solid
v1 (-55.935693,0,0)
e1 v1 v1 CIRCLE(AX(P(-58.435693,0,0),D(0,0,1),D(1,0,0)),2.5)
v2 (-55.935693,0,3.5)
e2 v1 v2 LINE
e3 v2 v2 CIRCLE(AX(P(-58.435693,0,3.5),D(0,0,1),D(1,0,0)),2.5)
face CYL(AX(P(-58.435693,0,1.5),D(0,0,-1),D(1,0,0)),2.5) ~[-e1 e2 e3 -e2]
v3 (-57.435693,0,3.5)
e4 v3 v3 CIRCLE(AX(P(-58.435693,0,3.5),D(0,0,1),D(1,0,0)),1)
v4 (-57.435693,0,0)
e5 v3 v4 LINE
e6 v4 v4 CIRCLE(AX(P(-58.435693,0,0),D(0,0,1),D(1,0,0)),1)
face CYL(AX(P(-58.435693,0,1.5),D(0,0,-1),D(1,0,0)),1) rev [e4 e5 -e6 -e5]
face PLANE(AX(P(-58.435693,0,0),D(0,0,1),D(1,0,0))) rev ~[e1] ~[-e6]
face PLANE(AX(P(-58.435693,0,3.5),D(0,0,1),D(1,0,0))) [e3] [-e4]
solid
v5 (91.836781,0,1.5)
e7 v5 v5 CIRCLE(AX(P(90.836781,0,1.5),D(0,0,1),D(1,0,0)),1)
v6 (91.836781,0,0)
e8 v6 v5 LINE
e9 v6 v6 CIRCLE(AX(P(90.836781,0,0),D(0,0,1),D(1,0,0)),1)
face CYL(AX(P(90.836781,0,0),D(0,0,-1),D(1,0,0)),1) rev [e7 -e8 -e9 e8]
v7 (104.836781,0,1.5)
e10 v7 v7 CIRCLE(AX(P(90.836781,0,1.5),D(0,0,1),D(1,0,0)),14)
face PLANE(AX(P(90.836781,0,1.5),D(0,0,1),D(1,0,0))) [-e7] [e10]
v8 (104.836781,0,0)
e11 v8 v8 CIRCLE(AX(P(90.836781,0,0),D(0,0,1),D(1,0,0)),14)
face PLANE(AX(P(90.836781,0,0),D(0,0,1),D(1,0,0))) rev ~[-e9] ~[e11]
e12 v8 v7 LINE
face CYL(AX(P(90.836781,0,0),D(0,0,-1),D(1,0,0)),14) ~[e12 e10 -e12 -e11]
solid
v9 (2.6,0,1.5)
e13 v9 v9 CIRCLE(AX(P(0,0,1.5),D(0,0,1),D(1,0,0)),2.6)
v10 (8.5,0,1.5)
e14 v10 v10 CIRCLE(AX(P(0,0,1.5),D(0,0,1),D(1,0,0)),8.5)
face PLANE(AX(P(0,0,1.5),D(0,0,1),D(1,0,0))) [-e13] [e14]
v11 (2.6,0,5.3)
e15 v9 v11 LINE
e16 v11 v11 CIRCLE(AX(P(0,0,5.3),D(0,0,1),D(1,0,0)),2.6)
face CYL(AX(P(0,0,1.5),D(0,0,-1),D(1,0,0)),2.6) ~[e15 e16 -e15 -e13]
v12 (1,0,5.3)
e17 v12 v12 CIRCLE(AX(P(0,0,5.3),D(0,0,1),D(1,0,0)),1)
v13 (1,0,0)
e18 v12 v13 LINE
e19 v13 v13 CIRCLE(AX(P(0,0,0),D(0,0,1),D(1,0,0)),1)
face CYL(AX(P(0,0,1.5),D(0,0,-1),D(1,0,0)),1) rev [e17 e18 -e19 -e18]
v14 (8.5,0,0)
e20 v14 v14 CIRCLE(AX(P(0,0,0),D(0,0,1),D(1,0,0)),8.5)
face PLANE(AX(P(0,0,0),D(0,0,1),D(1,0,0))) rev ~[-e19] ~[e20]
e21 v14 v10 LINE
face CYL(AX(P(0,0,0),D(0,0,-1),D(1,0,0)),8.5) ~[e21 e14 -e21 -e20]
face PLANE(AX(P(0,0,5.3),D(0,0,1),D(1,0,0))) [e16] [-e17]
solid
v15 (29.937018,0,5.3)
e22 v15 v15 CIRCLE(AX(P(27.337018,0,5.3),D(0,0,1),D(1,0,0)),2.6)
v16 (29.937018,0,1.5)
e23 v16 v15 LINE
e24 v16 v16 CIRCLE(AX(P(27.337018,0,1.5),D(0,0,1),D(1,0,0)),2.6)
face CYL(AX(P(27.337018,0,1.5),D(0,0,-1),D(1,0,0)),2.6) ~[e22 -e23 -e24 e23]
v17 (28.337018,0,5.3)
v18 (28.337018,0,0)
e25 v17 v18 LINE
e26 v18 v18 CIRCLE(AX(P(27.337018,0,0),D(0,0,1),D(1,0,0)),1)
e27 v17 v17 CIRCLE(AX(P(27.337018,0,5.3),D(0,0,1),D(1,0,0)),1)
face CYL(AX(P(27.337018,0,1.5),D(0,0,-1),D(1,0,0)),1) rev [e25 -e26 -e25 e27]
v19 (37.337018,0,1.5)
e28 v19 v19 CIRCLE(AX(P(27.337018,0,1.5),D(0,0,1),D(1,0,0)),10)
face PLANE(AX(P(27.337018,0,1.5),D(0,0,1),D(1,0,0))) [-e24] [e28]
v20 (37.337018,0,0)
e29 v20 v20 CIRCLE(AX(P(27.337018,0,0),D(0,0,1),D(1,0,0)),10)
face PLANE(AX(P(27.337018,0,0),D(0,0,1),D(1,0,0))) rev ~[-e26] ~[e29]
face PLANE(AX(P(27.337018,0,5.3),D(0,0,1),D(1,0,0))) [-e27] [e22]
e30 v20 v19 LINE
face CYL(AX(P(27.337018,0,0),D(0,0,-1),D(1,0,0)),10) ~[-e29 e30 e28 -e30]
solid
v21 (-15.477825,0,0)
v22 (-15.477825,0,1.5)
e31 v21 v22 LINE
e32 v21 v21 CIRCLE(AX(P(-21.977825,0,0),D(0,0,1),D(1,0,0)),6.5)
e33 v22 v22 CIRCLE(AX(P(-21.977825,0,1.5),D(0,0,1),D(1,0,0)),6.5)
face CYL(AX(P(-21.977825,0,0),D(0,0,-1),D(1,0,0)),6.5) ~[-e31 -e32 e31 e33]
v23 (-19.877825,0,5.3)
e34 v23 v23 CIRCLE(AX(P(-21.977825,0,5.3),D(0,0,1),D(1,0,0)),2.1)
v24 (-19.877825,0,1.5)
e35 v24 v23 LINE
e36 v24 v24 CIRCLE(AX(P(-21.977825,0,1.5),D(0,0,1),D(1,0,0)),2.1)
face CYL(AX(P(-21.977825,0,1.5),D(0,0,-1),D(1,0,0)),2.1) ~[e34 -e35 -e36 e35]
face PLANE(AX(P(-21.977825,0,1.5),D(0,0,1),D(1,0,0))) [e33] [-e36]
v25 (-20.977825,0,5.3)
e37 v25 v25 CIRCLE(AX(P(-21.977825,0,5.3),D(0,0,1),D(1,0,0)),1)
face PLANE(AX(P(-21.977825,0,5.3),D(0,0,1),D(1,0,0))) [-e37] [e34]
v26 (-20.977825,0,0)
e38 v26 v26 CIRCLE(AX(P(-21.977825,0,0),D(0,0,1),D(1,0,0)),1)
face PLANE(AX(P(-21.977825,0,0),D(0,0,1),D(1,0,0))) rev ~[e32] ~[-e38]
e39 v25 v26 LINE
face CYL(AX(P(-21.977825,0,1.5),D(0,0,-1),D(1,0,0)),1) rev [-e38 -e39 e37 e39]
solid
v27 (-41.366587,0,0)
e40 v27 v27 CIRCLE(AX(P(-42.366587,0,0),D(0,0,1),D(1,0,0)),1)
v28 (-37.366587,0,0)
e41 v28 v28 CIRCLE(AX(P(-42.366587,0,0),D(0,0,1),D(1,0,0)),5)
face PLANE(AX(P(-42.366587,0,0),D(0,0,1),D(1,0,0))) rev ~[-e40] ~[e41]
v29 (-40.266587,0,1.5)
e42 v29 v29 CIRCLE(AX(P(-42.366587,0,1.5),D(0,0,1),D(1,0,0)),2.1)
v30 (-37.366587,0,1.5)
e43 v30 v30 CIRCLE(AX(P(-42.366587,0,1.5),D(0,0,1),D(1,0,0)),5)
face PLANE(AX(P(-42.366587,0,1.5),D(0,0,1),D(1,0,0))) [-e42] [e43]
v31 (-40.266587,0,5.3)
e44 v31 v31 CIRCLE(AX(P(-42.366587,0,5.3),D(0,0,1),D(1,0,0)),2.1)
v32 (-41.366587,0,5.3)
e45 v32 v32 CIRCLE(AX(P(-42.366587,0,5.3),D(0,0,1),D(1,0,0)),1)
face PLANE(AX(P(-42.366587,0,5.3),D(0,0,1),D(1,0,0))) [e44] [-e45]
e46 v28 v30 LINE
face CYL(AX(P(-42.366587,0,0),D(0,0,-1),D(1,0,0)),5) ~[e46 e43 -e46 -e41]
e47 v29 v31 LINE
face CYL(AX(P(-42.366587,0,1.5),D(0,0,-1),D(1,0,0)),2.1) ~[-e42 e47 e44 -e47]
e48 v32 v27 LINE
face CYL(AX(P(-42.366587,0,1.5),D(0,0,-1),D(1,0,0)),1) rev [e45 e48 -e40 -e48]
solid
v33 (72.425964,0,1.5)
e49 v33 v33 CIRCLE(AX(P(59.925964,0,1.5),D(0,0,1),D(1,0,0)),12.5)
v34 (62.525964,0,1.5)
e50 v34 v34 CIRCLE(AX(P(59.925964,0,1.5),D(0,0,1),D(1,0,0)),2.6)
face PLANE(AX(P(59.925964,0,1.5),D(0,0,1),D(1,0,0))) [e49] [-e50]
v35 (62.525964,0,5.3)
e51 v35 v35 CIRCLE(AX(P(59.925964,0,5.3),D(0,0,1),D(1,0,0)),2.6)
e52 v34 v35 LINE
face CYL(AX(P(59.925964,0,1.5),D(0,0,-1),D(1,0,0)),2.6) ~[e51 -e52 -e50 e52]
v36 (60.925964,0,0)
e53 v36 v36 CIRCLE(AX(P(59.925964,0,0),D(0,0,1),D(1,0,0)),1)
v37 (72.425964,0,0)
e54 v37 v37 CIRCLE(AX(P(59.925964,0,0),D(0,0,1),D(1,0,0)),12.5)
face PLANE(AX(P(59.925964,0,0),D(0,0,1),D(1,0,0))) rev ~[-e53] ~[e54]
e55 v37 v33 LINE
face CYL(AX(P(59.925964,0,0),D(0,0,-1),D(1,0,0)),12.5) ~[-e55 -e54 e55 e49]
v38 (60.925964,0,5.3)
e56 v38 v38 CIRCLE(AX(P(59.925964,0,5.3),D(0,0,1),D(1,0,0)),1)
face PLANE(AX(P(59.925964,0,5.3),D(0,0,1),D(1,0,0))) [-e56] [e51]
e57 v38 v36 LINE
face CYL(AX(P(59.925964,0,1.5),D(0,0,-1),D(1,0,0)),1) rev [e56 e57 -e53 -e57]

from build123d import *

# Parameters (mm, degrees)
F0_R      = 8.5
F0_R_2    = 1
F1_DEPTH  = 1.5
F2_R      = 2.6
F2_R_2    = 1
F3_DEPTH  = 3.8
F4_R      = 10
F4_R_2    = 1
F5_DEPTH  = 1.5
F4_R_3    = 12.5
F4_R_4    = 6.5
F4_R_5    = 5
F4_R_6    = 2.5
F6_R      = 2.6
F6_R_2    = 1
F7_DEPTH  = 3.8
F8_R      = 2.6
F8_R_2    = 1
F9_DEPTH  = 3.8
F10_R     = 2.1
F10_R_2   = 1
F11_DEPTH = 3.8
F12_R     = 2.1
F12_R_2   = 1
F13_DEPTH = 3.8
F14_DEPTH = 2
F15_R     = 14
F15_R_2   = 1
F16_DEPTH = 1.5


# Not quite as in the source:
# - a feature names something its author has since deleted; it is built from what else it names


with BuildPart() as f1:
    # F0 (on Top) → F1 (new body)
    with BuildSketch(Plane.XY):
        Circle(F0_R)
        Circle(F0_R_2, mode=Mode.SUBTRACT)
    extrude(amount=F1_DEPTH)

    # F2 (on face) → F3 (join)
    with BuildSketch(Plane.XY.offset(1.5)):
        Circle(F2_R)
        Circle(F2_R_2, mode=Mode.SUBTRACT)
    extrude(amount=F3_DEPTH)


with BuildPart() as f5:
    # F4 (on Top) → F5 (new body)
    with BuildSketch(Plane.XY):
        with Locations((27.3370184205, 0)):
            Circle(F4_R)
        with Locations((27.3370184205, 0)):
            Circle(F4_R_2, mode=Mode.SUBTRACT)
    extrude(amount=F5_DEPTH)

    # F6 (on face) → F7 (join)
    with BuildSketch(Plane.XY.offset(1.5)):
        with Locations((27.3370184205, 0)):
            Circle(F6_R)
        with Locations((27.3370184205, 0)):
            Circle(F6_R_2, mode=Mode.SUBTRACT)
    extrude(amount=F7_DEPTH)


with BuildPart() as f5b:
    # F4 (on Top) → F5, piece 2 (new body)
    with BuildSketch(Plane.XY):
        with Locations((59.9259639982, 0)):
            Circle(F4_R_3)
        with Locations((59.9259639982, 0)):
            Circle(F4_R_2, mode=Mode.SUBTRACT)
    extrude(amount=F5_DEPTH)

    # F8 (on face) → F9 (join)
    with BuildSketch(Plane.XY.offset(1.5)):
        with Locations((59.9259639982, 0)):
            Circle(F8_R)
        with Locations((59.9259639982, 0)):
            Circle(F8_R_2, mode=Mode.SUBTRACT)
    extrude(amount=F9_DEPTH)


with BuildPart() as f5c:
    # F4 (on Top) → F5, piece 3 (new body)
    with BuildSketch(Plane.XY):
        with Locations((-21.9778250903, 0)):
            Circle(F4_R_4)
        with Locations((-21.9778250903, 0)):
            Circle(F4_R_2, mode=Mode.SUBTRACT)
    extrude(amount=F5_DEPTH)

    # F10 (on face) → F11 (join)
    with BuildSketch(Plane.XY.offset(1.5)):
        with Locations((-21.9778250903, 0)):
            Circle(F10_R)
        with Locations((-21.9778250903, 0)):
            Circle(F10_R_2, mode=Mode.SUBTRACT)
    extrude(amount=F11_DEPTH)


with BuildPart() as f5d:
    # F4 (on Top) → F5, piece 4 (new body)
    with BuildSketch(Plane.XY):
        with Locations((-42.3665866256, 0)):
            Circle(F4_R_5)
        with Locations((-42.3665866256, 0)):
            Circle(F4_R_2, mode=Mode.SUBTRACT)
    extrude(amount=F5_DEPTH)

    # F12 (on face) → F13 (join)
    with BuildSketch(Plane.XY.offset(1.5)):
        with Locations((-42.3665866256, 0)):
            Circle(F12_R)
        with Locations((-42.3665866256, 0)):
            Circle(F12_R_2, mode=Mode.SUBTRACT)
    extrude(amount=F13_DEPTH)


with BuildPart() as f5e:
    # F4 (on Top) → F5, piece 5 (new body)
    with BuildSketch(Plane.XY):
        with Locations((-58.4356933832, 0)):
            Circle(F4_R_6)
        with Locations((-58.4356933832, 0)):
            Circle(F4_R_2, mode=Mode.SUBTRACT)
    extrude(amount=F5_DEPTH)

    # F14 (add): a face of the model
    f14_faces = [f5e.faces().sort_by_distance(p)[0] for p in [
        (-60.8649827051, 0, 1.5),
    ]]
    extrude(f14_faces, amount=F14_DEPTH)


with BuildPart() as f16:
    # F15 (on Top) → F16 (new body)
    with BuildSketch(Plane.XY):
        with Locations((90.8367805009, 0)):
            Circle(F15_R)
        with Locations((90.8367805009, 0)):
            Circle(F15_R_2, mode=Mode.SUBTRACT)
    extrude(amount=F16_DEPTH)


solid = Compound([f1.part, f5.part, f5b.part, f5c.part, f5d.part, f5e.part, f16.part])
